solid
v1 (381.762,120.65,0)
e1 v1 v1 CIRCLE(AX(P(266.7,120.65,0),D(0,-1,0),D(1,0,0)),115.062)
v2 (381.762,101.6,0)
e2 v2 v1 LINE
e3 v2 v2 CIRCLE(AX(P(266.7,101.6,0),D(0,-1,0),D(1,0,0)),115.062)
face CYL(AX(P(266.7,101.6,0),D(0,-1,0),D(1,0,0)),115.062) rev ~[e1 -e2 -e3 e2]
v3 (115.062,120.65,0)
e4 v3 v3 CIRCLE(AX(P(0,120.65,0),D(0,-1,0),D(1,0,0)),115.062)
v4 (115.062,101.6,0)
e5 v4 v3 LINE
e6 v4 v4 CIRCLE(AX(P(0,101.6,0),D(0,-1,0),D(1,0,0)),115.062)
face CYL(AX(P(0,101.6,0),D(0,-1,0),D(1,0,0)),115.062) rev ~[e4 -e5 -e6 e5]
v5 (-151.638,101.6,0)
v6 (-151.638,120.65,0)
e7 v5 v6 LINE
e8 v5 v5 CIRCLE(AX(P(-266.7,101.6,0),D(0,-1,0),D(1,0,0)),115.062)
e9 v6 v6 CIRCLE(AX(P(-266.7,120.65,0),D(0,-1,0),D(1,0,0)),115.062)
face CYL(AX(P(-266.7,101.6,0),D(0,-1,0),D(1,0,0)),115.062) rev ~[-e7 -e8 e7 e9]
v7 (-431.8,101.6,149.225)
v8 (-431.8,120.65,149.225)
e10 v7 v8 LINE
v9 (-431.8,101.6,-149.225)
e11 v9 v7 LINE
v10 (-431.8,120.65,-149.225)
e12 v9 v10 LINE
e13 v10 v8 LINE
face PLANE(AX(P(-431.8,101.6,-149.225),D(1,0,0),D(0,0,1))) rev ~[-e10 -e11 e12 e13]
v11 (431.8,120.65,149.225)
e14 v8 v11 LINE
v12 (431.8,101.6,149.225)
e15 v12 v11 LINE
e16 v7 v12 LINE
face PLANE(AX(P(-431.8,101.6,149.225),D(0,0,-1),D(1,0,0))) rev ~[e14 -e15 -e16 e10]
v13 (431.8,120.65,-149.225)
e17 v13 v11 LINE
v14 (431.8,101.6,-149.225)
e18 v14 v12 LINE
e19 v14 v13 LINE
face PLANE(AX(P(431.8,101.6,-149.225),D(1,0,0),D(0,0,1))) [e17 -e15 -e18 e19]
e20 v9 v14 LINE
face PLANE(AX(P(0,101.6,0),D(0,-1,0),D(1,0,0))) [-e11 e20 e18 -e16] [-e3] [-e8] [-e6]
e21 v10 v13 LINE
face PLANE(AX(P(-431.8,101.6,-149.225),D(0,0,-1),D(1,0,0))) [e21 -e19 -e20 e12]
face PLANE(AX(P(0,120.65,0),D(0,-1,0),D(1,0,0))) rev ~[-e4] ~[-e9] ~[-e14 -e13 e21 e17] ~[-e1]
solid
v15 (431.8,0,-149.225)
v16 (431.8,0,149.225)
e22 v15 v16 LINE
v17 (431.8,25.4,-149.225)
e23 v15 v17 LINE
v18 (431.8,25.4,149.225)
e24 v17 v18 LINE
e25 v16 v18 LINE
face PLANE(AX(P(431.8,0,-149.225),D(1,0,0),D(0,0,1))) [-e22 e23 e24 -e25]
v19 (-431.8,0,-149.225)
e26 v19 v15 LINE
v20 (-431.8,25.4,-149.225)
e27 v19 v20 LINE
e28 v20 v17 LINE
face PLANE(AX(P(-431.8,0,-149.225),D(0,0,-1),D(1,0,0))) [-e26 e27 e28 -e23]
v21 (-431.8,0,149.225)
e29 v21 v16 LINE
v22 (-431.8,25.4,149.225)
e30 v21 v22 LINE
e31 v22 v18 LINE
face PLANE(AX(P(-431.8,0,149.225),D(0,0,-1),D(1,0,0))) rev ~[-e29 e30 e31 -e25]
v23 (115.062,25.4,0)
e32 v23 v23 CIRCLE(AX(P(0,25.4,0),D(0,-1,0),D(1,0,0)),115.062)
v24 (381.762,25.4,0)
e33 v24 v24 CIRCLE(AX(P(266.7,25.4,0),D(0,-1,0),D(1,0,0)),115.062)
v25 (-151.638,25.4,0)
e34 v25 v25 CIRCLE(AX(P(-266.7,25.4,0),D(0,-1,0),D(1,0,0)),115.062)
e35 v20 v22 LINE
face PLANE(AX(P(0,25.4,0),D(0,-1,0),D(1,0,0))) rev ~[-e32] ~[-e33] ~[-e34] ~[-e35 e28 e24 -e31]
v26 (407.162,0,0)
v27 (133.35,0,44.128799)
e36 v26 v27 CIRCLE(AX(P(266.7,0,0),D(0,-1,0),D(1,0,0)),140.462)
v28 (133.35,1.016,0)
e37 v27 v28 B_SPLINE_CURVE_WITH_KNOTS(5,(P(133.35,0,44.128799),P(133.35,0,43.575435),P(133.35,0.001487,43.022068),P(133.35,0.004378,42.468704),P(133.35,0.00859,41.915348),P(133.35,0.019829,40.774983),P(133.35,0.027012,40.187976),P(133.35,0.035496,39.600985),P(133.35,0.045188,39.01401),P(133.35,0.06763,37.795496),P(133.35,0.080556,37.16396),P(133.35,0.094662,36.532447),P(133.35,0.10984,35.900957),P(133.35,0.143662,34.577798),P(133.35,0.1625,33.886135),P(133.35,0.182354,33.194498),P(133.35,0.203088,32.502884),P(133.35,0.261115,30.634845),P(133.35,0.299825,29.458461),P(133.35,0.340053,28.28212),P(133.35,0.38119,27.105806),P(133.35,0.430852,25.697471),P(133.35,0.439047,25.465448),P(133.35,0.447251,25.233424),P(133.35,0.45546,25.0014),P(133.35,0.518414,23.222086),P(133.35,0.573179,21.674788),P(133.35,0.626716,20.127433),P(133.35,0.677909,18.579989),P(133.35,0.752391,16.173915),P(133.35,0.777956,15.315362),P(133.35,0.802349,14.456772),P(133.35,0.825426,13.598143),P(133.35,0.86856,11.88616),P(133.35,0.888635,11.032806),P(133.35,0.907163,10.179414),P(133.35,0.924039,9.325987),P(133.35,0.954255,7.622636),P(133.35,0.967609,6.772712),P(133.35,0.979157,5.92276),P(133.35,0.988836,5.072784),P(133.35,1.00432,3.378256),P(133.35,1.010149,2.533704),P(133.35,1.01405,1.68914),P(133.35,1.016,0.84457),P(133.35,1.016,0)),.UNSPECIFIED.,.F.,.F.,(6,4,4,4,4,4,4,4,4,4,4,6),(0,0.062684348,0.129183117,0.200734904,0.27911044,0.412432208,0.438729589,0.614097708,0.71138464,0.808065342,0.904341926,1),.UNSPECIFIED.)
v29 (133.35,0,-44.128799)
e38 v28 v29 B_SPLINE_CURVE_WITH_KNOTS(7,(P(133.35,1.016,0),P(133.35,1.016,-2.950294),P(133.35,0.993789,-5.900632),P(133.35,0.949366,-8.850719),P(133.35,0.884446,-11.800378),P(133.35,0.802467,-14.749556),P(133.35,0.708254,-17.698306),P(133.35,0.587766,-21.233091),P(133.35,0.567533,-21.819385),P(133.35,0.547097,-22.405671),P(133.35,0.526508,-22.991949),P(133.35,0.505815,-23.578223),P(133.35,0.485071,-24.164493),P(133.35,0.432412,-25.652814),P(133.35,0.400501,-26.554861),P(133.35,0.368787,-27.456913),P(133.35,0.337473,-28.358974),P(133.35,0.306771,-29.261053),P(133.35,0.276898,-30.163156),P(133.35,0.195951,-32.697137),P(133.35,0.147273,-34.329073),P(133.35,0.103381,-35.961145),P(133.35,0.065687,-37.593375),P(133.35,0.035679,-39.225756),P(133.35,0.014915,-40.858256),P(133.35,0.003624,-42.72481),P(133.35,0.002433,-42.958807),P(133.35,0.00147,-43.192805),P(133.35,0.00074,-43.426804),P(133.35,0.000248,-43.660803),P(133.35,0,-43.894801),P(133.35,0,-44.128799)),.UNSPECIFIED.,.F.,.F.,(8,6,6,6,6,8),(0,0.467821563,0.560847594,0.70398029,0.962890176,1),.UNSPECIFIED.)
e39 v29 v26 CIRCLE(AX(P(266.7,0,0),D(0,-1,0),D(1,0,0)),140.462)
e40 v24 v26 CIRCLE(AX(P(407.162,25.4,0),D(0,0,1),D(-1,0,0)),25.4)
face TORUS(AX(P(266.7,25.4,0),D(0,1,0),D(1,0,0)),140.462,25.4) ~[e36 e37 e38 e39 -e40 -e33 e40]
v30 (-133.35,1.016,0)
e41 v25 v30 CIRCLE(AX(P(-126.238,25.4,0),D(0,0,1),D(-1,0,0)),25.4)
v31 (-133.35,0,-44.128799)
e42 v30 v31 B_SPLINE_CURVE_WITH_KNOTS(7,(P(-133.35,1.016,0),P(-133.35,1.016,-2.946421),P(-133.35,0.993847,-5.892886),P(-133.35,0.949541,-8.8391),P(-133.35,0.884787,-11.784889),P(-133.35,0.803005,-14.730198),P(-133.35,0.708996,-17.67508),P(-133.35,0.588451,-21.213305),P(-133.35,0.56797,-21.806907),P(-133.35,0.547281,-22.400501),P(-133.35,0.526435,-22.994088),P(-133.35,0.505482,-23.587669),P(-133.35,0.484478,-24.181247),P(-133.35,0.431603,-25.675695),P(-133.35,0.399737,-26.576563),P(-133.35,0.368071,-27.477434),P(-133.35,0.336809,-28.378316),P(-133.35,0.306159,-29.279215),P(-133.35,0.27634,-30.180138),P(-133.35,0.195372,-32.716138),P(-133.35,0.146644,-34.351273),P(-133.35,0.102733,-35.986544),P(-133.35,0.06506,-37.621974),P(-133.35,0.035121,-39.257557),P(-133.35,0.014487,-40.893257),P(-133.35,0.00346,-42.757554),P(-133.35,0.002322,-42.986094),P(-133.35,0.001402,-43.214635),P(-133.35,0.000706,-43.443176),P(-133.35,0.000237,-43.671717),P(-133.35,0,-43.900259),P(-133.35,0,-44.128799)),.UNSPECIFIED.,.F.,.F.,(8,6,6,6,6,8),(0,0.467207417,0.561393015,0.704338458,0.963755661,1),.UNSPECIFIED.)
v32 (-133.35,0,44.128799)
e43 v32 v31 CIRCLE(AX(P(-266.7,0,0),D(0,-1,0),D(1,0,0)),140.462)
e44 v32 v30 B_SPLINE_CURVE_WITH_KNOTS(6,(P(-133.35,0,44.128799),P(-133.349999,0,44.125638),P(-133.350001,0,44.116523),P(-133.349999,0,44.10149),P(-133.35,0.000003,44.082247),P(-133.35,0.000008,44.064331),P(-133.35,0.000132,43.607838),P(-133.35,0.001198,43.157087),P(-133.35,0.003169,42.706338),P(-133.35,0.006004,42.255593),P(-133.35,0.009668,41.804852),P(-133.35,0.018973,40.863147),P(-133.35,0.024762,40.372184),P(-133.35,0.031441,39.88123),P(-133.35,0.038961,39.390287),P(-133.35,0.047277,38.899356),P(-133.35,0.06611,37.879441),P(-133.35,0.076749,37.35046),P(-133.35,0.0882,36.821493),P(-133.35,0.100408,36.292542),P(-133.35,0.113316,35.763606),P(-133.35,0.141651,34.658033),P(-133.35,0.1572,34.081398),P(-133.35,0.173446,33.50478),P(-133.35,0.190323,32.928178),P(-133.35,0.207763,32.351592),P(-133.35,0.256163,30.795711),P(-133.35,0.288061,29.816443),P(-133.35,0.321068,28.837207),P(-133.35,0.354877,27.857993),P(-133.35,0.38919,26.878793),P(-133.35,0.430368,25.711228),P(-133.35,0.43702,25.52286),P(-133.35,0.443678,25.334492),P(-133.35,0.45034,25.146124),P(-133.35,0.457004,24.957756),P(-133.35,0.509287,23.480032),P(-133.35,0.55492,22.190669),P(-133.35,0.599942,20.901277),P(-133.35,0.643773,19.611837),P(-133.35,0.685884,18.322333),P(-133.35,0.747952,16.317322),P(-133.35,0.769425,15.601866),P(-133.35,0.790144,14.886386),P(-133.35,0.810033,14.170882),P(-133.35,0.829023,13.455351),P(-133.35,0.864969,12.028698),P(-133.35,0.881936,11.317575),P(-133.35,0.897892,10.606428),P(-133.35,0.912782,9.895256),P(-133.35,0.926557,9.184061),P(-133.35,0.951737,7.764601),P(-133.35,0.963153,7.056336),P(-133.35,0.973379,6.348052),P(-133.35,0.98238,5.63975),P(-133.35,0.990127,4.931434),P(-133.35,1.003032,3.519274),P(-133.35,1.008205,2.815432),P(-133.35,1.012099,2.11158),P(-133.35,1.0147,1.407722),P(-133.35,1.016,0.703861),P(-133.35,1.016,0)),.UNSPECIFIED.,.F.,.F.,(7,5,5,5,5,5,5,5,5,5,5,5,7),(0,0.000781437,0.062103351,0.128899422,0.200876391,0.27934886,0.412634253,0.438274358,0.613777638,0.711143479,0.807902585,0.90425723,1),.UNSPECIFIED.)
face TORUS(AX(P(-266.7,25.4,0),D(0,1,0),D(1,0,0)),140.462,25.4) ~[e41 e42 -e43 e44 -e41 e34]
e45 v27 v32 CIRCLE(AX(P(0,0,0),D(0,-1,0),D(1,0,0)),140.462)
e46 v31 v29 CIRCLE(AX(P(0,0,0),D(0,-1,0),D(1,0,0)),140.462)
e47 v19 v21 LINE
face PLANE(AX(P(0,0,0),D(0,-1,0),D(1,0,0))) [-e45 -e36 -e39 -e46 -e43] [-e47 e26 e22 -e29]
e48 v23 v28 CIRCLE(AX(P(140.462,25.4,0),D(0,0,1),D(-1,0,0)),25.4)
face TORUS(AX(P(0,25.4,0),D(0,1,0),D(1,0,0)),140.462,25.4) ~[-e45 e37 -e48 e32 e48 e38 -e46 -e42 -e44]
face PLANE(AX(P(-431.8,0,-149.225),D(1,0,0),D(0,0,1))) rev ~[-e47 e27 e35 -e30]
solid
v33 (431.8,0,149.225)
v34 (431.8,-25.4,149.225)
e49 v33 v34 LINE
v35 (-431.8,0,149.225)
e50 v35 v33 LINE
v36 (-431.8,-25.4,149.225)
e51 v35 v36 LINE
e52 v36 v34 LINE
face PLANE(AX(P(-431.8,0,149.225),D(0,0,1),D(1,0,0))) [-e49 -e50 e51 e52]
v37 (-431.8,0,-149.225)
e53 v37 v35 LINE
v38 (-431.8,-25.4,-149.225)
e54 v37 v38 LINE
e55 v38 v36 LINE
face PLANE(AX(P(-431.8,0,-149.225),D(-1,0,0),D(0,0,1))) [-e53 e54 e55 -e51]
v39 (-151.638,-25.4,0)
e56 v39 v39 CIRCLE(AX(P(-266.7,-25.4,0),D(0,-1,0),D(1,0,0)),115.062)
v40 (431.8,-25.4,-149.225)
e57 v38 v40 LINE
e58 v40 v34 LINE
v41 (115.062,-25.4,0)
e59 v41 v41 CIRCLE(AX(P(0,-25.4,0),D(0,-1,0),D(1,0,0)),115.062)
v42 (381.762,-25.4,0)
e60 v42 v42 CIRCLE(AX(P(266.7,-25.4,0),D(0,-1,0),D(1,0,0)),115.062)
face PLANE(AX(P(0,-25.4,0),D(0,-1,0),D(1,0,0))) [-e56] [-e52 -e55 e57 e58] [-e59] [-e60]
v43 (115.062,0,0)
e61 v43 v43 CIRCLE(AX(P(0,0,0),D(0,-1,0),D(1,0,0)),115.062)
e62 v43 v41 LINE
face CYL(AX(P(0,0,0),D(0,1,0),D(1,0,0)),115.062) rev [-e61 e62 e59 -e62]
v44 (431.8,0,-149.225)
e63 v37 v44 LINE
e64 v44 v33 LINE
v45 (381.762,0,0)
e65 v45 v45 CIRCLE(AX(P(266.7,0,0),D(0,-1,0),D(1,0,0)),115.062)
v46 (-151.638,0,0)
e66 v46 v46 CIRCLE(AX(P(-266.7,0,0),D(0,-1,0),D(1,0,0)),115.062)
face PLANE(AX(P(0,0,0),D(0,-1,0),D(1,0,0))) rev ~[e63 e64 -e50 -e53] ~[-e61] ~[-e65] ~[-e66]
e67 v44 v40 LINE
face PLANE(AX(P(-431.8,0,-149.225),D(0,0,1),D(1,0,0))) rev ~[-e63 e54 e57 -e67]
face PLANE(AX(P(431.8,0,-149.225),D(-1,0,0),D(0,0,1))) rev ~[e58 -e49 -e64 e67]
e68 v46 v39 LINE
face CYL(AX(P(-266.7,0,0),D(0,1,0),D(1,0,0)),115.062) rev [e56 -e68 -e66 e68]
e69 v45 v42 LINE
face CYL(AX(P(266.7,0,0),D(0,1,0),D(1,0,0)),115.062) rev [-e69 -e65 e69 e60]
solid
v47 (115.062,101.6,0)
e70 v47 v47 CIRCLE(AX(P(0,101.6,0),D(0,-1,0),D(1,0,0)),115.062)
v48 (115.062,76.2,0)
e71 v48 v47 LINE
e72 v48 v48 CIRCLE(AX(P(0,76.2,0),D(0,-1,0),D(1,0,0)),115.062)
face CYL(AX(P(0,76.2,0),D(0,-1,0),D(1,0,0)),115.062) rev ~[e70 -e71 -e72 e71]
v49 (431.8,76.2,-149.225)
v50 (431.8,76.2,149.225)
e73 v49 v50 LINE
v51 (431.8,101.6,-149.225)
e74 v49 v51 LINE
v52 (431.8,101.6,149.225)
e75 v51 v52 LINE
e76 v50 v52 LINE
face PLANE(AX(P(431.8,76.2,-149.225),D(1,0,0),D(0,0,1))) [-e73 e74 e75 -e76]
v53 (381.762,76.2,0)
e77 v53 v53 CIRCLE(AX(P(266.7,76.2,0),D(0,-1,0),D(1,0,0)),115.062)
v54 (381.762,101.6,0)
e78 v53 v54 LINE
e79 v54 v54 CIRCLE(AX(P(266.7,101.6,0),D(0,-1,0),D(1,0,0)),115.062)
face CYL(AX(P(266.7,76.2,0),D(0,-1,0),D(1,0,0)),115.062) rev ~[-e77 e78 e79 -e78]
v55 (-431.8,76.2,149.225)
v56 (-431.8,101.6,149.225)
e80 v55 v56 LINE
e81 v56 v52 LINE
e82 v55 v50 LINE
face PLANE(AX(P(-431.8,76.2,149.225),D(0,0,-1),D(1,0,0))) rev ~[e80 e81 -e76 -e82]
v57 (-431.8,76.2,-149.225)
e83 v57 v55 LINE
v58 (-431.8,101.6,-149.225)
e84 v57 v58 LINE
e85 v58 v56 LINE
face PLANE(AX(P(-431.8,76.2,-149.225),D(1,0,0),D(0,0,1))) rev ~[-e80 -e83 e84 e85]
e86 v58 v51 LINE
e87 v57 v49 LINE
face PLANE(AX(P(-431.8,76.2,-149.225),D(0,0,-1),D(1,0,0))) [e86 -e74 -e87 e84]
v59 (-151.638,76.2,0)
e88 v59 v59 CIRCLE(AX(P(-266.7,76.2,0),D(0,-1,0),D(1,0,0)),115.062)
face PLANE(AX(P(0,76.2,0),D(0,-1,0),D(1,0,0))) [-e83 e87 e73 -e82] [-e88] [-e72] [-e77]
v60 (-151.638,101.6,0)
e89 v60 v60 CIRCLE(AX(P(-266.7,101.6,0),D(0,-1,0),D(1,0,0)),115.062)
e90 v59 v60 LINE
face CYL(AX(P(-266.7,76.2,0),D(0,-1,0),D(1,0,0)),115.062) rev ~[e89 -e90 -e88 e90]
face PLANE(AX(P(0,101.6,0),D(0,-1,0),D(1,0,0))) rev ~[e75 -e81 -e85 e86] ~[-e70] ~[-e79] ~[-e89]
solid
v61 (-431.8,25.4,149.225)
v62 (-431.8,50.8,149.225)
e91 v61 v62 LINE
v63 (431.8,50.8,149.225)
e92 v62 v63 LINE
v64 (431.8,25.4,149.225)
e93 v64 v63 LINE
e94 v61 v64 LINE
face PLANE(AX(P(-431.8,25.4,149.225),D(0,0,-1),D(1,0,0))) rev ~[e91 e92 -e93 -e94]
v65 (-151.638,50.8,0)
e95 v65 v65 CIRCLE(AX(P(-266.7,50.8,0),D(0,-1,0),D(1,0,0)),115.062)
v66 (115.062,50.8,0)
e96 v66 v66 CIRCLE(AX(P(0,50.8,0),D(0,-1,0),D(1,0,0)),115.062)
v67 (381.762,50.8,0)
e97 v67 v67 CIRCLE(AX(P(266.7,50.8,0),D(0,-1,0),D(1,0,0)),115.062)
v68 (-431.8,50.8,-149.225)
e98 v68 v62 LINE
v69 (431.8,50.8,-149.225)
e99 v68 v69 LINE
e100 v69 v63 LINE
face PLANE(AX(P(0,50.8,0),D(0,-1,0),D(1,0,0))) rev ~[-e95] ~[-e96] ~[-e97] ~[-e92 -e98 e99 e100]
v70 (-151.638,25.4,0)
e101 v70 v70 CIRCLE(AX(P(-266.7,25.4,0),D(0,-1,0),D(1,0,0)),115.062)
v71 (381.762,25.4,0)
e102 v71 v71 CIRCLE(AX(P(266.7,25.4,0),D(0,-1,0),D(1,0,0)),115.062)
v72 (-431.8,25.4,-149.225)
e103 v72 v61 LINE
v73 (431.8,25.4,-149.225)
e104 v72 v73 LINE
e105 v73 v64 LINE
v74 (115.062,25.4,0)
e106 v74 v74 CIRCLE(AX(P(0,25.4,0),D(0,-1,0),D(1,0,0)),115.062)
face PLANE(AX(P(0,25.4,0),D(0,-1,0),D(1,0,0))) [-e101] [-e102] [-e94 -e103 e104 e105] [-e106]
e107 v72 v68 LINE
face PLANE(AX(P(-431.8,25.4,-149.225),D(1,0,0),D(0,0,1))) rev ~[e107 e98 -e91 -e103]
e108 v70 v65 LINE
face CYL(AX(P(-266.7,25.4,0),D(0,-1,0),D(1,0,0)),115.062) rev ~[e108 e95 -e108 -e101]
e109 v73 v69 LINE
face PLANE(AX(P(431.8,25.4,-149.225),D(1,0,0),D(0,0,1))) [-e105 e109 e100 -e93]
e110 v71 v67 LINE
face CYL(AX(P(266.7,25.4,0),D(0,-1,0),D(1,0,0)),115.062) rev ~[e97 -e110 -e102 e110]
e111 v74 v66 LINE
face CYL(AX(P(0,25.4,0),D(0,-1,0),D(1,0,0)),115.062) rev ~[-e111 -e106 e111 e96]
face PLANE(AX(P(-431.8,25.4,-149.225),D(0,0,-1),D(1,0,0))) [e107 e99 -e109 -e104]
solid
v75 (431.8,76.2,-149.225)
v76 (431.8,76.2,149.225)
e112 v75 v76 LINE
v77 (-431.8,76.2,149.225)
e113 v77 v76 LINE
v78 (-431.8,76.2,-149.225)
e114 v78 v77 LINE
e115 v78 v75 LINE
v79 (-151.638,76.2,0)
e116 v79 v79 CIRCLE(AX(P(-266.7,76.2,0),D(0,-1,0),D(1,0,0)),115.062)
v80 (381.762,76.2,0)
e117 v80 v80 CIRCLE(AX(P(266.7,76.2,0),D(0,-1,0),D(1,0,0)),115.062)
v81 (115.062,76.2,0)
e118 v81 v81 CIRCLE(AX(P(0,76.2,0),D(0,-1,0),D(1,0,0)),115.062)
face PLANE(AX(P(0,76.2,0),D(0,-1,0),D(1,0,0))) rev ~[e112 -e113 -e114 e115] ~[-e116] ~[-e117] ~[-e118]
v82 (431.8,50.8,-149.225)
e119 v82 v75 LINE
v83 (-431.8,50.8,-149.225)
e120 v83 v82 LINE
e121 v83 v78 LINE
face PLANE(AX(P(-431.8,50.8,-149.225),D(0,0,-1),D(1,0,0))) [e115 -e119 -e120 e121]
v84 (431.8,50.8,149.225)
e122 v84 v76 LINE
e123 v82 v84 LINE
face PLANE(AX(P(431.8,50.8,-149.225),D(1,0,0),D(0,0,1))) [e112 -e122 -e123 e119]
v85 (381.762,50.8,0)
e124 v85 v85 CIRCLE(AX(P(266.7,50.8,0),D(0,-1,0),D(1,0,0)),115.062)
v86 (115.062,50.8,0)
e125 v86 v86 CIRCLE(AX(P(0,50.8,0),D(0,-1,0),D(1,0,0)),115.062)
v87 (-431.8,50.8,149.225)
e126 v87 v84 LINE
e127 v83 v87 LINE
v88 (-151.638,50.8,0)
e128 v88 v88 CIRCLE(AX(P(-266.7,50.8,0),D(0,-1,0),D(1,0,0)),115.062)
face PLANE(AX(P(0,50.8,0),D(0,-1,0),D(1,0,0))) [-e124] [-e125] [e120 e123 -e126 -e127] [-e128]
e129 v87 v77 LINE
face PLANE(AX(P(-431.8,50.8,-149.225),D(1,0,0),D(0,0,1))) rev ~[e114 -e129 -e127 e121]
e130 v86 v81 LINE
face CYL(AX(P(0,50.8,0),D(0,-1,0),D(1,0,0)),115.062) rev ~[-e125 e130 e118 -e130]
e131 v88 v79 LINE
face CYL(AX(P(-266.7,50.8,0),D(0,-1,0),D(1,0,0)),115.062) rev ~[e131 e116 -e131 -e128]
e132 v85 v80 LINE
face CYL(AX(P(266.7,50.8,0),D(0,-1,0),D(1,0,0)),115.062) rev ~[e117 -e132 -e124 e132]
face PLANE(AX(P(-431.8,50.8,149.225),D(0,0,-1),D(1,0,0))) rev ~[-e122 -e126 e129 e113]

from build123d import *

# Parameters (mm, degrees)
F0_W     = 863.6
F0_H     = 298.45
F0_R     = 115.062
F1_DEPTH = 25.4
F2_DEPTH = 25.4
F3_DEPTH = 25.4
F4_DEPTH = 25.4
F5_DEPTH = 25.4
F6_DEPTH = 19.05


# Not quite as in the source:
# - a fillet or chamfer that OpenCascade refuses, or shapes differently, is made with other operations: its cross-section is extruded or revolved along the edge and cut away or added


with BuildPart() as f1:
    # F0 (on Front) → F1 (new body)
    with BuildSketch(Plane.XZ):
        Rectangle(F0_W, F0_H)
        with Locations((-266.7, 0)):
            Circle(F0_R, mode=Mode.SUBTRACT)
        Circle(F0_R, mode=Mode.SUBTRACT)
        with Locations((266.7, 0)):
            Circle(F0_R, mode=Mode.SUBTRACT)
    extrude(amount=F1_DEPTH)


with BuildPart() as f2:
    # F2 (new): a face of the model
    f2_faces = [f1.part.faces().sort_by_distance(p)[0] for p in [
        (422.6628376259, 0, 0),
    ]]
    extrude(f2_faces, amount=F2_DEPTH)


with BuildPart() as f3:
    # F3 (new): a face of the model
    f3_faces = [f2.part.faces().sort_by_distance(p)[0] for p in [
        (422.6628376259, 25.4, 0),
    ]]
    extrude(f3_faces, amount=F3_DEPTH)


with BuildPart() as f4:
    # F4 (new): a face of the model
    f4_faces = [f3.part.faces().sort_by_distance(p)[0] for p in [
        (422.6628376259, 50.8, 0),
    ]]
    extrude(f4_faces, amount=F4_DEPTH)


with BuildPart() as f5:
    # F5 (new): a face of the model
    f5_faces = [f4.part.faces().sort_by_distance(p)[0] for p in [
        (422.6628376259, 76.2, 0),
    ]]
    extrude(f5_faces, amount=F5_DEPTH)


with BuildPart() as f6:
    # F6 (new): a face of the model
    f6_faces = [f5.part.faces().sort_by_distance(p)[0] for p in [
        (422.6628376259, 101.6, 0),
    ]]
    extrude(f6_faces, amount=F6_DEPTH)


with BuildPart() as f2_1:
    add(f2.part)

    # F7: fillet of radius 25.4 on 3 edges, made by hand

    # F7_s1 → F7_t2 (revolve, cut)
    with BuildSketch(Plane.XY):
        with BuildLine():
            ThreePointArc((-151.638, 25.4), (-144.1985122421, 7.4394877579), (-126.238, 0))
            Line((-126.238, 0), (-151.638, 0))
            Line((-151.638, 0), (-151.638, 25.4))
        make_face()
    revolve(axis=Axis((-266.7, 0, 0), (0, -1, 0)), mode=Mode.SUBTRACT)

    # F7_s3 → F7_t4 (revolve, cut)
    with BuildSketch(Plane.XY):
        with BuildLine():
            ThreePointArc((115.062, 25.4), (122.5014877579, 7.4394877579), (140.462, 0))
            Line((140.462, 0), (115.062, 0))
            Line((115.062, 0), (115.062, 25.4))
        make_face()
    revolve(axis=Axis((0, 0, 0), (0, -1, 0)), mode=Mode.SUBTRACT)

    # F7_s5 → F7_t6 (revolve, cut)
    with BuildSketch(Plane.XY):
        with BuildLine():
            ThreePointArc((381.762, 25.4), (389.2014877579, 7.4394877579), (407.162, 0))
            Line((407.162, 0), (381.762, 0))
            Line((381.762, 0), (381.762, 25.4))
        make_face()
    revolve(axis=Axis((266.7, 0, 0), (0, -1, 0)), mode=Mode.SUBTRACT)


solid = Compound([f1.part, f3.part, f4.part, f5.part, f6.part, f2_1.part])
